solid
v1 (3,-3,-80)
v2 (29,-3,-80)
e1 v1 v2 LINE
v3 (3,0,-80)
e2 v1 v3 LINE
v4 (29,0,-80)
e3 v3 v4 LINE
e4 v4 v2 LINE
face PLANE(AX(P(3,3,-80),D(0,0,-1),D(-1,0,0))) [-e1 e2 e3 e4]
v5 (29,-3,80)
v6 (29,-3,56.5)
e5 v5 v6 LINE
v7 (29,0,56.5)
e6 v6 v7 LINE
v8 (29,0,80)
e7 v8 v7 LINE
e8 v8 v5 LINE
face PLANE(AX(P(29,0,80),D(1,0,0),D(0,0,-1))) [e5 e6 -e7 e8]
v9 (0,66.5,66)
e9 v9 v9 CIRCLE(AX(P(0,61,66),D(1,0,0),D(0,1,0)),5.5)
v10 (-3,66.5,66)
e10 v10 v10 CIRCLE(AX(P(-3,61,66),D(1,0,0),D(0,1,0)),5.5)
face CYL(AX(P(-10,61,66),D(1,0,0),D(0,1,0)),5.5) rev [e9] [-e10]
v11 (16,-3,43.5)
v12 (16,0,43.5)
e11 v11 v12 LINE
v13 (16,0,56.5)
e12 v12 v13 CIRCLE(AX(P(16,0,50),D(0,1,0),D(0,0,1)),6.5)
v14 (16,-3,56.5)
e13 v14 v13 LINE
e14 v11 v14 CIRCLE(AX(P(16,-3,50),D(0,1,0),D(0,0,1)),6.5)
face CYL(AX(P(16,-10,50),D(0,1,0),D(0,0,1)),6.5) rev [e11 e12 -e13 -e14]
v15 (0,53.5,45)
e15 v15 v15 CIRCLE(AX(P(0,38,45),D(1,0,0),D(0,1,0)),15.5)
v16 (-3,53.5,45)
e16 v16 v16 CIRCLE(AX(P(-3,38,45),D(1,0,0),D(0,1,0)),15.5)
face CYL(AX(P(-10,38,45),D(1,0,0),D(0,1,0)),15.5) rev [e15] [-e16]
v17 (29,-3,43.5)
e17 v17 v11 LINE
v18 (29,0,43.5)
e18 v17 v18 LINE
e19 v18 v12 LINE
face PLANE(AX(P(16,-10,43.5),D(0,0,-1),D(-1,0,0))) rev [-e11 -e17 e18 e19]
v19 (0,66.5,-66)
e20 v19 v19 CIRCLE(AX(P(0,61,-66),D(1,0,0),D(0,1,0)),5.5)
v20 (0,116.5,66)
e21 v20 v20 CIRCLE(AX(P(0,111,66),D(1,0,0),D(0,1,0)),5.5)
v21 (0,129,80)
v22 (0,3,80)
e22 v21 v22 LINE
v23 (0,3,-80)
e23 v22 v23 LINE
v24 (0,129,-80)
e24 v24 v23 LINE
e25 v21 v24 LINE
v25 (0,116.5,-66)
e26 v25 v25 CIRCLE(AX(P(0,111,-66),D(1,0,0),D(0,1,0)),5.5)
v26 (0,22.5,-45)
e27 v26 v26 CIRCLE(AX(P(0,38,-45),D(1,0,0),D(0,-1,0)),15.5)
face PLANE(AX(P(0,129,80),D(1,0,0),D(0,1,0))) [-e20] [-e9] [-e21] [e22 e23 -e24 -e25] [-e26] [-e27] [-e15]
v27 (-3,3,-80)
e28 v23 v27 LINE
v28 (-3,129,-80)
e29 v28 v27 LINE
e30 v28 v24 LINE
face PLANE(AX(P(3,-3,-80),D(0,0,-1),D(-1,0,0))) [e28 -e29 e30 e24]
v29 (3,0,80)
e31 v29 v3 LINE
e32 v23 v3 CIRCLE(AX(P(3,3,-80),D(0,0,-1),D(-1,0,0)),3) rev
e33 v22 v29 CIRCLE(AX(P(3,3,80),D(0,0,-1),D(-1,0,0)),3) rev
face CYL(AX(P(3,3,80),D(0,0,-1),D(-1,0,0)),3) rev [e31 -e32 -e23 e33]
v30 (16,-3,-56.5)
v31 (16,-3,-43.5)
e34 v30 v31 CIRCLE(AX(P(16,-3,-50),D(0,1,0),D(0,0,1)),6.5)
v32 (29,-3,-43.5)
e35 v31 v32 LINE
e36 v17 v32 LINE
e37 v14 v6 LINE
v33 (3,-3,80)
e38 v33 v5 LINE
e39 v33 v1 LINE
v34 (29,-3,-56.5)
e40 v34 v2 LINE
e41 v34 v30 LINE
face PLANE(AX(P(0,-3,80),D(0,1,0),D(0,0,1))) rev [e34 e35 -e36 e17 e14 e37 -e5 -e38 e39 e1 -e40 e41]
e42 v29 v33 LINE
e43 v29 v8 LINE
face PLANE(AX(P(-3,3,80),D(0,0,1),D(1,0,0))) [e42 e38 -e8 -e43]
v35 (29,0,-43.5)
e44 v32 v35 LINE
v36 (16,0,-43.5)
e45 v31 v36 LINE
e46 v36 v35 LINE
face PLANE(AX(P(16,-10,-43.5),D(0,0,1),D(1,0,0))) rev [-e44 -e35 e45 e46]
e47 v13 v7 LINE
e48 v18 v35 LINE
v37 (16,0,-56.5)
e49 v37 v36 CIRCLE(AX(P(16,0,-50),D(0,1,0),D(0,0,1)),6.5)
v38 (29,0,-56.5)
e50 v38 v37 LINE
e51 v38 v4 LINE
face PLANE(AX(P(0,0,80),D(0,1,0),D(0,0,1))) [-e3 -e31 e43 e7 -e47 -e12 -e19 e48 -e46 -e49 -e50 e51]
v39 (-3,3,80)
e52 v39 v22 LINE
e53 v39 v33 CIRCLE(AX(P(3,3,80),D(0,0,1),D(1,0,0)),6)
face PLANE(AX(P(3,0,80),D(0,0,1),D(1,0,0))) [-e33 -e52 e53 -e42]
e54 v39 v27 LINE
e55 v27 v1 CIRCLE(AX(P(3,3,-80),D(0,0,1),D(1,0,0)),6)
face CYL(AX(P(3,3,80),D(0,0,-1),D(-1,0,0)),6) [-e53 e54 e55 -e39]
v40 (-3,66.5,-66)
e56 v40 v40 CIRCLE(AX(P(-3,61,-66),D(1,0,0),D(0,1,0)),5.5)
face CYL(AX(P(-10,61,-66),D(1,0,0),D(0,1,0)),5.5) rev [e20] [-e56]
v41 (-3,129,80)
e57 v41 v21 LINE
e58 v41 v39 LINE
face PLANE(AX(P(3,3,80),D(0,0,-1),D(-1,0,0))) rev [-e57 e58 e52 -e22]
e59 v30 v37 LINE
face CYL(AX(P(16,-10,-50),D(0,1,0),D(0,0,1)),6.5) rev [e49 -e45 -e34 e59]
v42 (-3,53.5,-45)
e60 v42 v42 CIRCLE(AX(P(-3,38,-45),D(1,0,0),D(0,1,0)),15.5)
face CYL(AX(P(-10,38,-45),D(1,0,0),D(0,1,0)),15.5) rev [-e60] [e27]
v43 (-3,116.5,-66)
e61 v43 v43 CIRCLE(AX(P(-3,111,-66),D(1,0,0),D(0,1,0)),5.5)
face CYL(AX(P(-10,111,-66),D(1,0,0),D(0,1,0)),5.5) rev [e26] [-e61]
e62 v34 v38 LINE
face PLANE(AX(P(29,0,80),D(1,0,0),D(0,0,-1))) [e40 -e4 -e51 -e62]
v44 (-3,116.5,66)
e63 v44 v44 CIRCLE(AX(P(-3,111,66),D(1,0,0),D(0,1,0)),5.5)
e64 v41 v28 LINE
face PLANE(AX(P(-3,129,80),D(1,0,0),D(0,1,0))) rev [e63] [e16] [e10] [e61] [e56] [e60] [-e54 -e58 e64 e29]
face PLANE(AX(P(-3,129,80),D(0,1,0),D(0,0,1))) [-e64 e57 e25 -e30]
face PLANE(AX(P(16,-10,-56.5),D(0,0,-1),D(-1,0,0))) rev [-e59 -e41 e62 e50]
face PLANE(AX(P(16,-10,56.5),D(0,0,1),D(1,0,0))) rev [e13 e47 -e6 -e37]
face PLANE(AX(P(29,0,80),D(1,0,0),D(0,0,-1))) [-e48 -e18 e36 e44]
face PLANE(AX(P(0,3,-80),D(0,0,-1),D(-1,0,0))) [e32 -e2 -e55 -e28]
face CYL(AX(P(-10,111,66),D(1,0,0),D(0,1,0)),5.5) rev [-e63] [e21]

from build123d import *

# Parameters (mm, degrees)
SM_BASE_FLANGE_1_DEPTH = 80
SKETCH_6_R             = 5.5
CUT_EXTRUDE_1_DEPTH    = 10
SKETCH_7_R             = 15.5
CUT_EXTRUDE_2_DEPTH    = 10
CUT_EXTRUDE_3_DEPTH    = 10


# Sheet-metal steps are written as plain solids
with BuildPart() as part:
    # Sketch 1 → Базовая кромка1 (new, symmetric)
    with BuildSketch(Plane.XY):
        with BuildLine():
            Line((0, 129), (0, 3))
            ThreePointArc((0, 3), (0.878679656, 0.878679656), (3, 0))
            Line((3, 0), (29, 0))
            Line((29, 0), (29, -3))
            Line((29, -3), (3, -3))
            ThreePointArc((3, -3), (-1.242640687, -1.242640687), (-3, 3))
            Line((-3, 3), (-3, 129))
            Line((-3, 129), (0, 129))
        make_face()
    extrude(amount=SM_BASE_FLANGE_1_DEPTH, both=True)

    # Эскиз6 → Вырез-Вытянуть1 (cut)
    with BuildSketch(Plane(origin=(0, 0, 0), x_dir=(0, 0, -1), z_dir=(1, 0, 0))):
        with Locations(Location((-66, 111, 0), (0, 0, 90))):
            Circle(SKETCH_6_R)
        with Locations(Location((66, 111, 0), (0, 0, 90))):
            Circle(SKETCH_6_R)
        with Locations(Location((66, 61, 0), (0, 0, 90))):
            Circle(SKETCH_6_R)
        with Locations(Location((-66, 61, 0), (0, 0, 90))):
            Circle(SKETCH_6_R)
    extrude(amount=-CUT_EXTRUDE_1_DEPTH, mode=Mode.SUBTRACT)

    # Эскиз7 → Вырез-Вытянуть2 (cut)
    with BuildSketch(Plane(origin=(0, 0, 0), x_dir=(0, 0, -1), z_dir=(1, 0, 0))):
        with Locations(Location((-45, 38, 0), (0, 0, 90))):
            Circle(SKETCH_7_R)
        with Locations(Location((45, 38, 0), (0, 0, 90))):
            Circle(SKETCH_7_R)
    extrude(amount=-CUT_EXTRUDE_2_DEPTH, mode=Mode.SUBTRACT)

    # Эскиз8 → Вырез-Вытянуть3 (cut)
    with BuildSketch(Plane(origin=(0, 0, 0), x_dir=(1, 0, 0), z_dir=(0, 1, 0))):
        with BuildLine():
            Line((16, -43.5), (29, -43.5))
            ThreePointArc((29, -43.5), (35.5, -50), (29, -56.5))
            Line((29, -56.5), (16, -56.5))
            ThreePointArc((16, -56.5), (9.5, -50), (16, -43.5))
        make_face()
        with BuildLine():
            Line((16, 56.5), (29, 56.5))
            ThreePointArc((29, 56.5), (35.5, 50), (29, 43.5))
            Line((29, 43.5), (16, 43.5))
            ThreePointArc((16, 43.5), (9.5, 50), (16, 56.5))
        make_face()
    extrude(amount=-CUT_EXTRUDE_3_DEPTH, mode=Mode.SUBTRACT)


solid = part.part
